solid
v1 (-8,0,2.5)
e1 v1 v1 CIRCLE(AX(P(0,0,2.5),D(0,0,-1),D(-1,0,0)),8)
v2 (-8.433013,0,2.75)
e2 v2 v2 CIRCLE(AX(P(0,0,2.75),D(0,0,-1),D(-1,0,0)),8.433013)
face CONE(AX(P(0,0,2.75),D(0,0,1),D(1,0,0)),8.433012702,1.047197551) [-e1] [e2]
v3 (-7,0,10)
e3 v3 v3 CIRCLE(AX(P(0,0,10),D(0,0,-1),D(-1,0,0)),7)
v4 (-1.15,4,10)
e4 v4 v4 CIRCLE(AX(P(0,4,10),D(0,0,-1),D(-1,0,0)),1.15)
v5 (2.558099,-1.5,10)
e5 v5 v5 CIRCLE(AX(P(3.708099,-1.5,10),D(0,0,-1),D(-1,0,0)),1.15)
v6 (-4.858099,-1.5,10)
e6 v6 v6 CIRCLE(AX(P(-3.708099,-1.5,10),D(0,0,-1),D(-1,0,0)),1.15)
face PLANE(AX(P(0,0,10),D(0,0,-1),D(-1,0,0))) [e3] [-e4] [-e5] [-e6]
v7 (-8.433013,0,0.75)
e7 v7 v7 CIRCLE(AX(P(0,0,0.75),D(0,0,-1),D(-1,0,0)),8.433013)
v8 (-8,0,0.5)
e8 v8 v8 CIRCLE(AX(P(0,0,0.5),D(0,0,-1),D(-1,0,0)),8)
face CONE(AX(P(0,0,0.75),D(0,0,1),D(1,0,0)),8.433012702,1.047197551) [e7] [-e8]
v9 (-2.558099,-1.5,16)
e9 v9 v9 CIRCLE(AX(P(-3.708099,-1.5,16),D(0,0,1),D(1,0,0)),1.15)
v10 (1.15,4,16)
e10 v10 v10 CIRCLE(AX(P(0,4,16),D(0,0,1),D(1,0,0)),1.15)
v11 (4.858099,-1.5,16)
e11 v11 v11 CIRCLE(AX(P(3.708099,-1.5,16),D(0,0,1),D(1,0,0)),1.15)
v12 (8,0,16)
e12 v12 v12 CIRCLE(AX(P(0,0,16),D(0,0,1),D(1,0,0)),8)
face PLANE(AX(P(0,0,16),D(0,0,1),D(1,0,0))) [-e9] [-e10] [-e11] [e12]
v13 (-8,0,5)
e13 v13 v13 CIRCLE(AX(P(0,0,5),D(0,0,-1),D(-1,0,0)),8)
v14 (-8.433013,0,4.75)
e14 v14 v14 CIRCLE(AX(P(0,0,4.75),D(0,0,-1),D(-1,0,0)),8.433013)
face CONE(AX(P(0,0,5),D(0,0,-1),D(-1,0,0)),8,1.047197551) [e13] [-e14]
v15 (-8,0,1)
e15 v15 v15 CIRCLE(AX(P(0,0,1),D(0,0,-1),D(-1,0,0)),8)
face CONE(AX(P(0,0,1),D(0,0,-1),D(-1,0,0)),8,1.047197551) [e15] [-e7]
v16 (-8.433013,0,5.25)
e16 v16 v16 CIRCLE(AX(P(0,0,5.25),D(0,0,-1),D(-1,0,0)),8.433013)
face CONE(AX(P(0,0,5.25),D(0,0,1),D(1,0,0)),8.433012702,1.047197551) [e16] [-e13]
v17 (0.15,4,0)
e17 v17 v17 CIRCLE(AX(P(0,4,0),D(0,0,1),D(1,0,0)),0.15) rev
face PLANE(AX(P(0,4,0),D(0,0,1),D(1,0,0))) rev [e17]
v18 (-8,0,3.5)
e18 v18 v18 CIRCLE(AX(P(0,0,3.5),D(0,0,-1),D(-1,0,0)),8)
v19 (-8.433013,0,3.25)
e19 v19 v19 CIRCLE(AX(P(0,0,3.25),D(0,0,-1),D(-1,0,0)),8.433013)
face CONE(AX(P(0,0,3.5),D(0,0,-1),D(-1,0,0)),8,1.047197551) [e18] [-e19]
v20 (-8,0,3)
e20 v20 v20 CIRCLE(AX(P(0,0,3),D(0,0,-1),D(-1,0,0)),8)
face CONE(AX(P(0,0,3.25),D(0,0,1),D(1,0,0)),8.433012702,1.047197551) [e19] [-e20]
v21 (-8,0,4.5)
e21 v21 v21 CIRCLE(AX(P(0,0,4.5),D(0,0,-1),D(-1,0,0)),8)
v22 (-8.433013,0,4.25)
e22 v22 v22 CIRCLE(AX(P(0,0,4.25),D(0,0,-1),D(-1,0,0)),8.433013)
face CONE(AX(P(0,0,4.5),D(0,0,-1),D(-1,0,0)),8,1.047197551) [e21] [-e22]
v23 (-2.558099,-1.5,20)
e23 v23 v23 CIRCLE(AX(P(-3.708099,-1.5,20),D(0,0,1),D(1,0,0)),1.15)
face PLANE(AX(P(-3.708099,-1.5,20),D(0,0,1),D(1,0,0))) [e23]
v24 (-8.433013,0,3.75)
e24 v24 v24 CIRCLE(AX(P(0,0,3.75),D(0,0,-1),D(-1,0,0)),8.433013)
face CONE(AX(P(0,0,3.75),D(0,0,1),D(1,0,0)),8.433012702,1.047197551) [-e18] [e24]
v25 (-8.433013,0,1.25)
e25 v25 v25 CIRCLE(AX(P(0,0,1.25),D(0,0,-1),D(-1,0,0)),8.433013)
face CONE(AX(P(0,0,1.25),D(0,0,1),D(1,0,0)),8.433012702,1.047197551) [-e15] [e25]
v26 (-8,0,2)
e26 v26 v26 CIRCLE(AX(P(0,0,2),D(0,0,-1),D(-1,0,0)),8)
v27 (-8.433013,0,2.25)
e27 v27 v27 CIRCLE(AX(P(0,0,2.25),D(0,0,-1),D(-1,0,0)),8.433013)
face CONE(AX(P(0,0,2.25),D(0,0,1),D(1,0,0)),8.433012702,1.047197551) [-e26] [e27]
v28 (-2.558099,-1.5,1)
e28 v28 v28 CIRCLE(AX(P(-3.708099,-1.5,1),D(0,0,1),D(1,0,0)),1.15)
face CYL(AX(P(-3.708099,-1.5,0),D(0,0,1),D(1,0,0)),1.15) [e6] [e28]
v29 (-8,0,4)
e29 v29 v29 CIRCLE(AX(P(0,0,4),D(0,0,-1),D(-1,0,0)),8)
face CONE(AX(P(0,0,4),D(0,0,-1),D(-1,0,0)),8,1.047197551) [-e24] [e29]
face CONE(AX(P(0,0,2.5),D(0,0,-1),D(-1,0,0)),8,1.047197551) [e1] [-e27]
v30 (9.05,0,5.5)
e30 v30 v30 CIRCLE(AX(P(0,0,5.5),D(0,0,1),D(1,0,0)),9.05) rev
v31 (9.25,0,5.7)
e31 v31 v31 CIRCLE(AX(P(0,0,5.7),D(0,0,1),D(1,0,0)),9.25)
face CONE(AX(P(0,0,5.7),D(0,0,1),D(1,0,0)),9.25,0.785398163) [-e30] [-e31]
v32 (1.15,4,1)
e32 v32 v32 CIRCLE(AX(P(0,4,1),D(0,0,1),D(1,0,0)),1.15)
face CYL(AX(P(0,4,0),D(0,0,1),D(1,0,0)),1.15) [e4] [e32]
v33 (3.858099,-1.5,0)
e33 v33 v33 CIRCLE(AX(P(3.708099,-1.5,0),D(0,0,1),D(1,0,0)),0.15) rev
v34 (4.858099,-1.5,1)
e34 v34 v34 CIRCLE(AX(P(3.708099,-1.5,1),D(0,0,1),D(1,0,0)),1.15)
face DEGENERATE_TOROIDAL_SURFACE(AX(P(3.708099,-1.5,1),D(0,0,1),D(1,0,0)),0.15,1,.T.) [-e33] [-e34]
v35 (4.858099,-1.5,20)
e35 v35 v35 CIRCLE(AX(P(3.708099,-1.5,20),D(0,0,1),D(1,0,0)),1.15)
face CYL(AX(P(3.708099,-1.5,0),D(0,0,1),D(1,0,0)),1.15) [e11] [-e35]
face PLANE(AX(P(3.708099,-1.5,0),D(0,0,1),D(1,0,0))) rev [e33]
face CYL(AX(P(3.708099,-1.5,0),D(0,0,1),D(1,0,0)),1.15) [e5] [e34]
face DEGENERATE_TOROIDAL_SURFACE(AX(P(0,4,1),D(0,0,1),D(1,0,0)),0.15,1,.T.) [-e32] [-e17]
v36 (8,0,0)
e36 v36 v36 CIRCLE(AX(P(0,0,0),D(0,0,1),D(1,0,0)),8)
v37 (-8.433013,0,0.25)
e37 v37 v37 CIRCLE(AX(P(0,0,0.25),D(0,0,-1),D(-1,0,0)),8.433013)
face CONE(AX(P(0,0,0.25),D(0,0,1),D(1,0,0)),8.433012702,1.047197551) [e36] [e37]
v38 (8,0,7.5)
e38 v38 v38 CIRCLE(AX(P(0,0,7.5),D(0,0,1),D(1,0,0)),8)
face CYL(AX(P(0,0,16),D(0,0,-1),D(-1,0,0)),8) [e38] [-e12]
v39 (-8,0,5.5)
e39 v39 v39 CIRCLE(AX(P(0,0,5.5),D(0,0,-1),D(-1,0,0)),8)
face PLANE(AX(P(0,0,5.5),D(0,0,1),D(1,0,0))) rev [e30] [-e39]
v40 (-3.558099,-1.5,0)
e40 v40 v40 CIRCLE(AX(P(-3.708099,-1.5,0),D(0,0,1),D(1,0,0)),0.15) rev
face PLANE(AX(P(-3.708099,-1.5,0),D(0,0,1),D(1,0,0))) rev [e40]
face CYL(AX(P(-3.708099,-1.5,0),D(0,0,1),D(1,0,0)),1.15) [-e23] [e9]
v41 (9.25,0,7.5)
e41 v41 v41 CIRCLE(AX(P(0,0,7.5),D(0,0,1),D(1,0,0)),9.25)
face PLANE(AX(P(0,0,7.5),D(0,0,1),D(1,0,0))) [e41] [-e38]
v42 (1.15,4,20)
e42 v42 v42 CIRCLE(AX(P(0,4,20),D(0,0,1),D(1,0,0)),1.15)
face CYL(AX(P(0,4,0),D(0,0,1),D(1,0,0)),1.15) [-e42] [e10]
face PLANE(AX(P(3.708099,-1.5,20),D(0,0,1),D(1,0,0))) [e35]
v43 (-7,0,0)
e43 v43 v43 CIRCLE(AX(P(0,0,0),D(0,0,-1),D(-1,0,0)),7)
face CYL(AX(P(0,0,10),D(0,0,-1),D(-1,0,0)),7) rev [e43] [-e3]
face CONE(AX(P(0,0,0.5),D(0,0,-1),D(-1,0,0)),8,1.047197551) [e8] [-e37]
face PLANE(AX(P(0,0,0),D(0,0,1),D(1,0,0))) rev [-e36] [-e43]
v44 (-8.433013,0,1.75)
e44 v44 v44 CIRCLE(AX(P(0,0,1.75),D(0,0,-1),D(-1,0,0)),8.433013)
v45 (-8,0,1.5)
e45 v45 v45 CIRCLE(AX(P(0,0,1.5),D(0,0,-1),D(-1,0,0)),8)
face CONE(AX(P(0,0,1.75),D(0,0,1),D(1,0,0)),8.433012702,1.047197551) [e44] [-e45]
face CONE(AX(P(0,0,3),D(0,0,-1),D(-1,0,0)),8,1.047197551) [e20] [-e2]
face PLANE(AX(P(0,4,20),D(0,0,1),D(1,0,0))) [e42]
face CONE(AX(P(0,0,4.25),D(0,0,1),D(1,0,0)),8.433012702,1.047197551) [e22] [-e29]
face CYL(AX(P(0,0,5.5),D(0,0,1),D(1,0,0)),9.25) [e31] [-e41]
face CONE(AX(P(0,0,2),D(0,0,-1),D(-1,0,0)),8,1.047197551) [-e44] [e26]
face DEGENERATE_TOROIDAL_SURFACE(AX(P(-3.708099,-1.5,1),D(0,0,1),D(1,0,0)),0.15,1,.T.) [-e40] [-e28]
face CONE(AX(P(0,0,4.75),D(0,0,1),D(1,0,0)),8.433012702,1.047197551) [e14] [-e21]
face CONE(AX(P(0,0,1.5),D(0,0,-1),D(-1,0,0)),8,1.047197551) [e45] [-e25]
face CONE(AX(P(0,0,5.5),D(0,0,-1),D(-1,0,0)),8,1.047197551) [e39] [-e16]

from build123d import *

# Parameters (mm, degrees)
ESBO_O1_R                     = 8
RESSALTO_EXTRUS_O1_DEPTH      = 16
RESSALTO_EXTRUS_O3_START      = -2
ESBO_O3_R                     = 9.25
ESBO_O3_R_2                   = 8
RESSALTO_EXTRUS_O3_DEPTH      = 2
ESBO_O4_R                     = 7
CORTE_EXTRUS_O1_DEPTH         = 10
RESSALTO_EXTRUS_O2_DEPTH      = 4
RESSALTO_EXTRUS_O2_DEPTH_BACK = 16
ESBO_O2_R                     = 1.15
FILETE1_R                     = 1
PADR_O_LINEAR1_COUNT          = 11
PADR_O_LINEAR1_PITCH          = 0.5
CHANFRO1_SIZE                 = 0.2


with BuildPart() as part:
    # Esboço1 → Ressalto-extrusão1 (new body)
    with BuildSketch(Plane.XY):
        Circle(ESBO_O1_R)
    extrude(amount=RESSALTO_EXTRUS_O1_DEPTH)

    # Esboço3 → Ressalto-extrusão3 (add)
    with BuildSketch(Plane.XY.offset(7.5).offset(RESSALTO_EXTRUS_O3_START)):
        Circle(ESBO_O3_R)
        Circle(ESBO_O3_R_2, mode=Mode.SUBTRACT)
    extrude(amount=RESSALTO_EXTRUS_O3_DEPTH)

    # Esboço4 → Corte-extrusão1 (cut)
    with BuildSketch(Plane(origin=(0, 0, 0), x_dir=(-1, 0, 0), z_dir=(0, 0, -1))):
        Circle(ESBO_O4_R)
    extrude(amount=-CORTE_EXTRUS_O1_DEPTH, mode=Mode.SUBTRACT)

    # Esboço2 → Ressalto-extrusão2 (add, two sides: drawn at the far end of the back side and taken through both)
    with BuildSketch(Plane.XY.offset(16).offset(-RESSALTO_EXTRUS_O2_DEPTH_BACK)):
        with Locations((0, 4)):
            Circle(ESBO_O2_R)
        with Locations((3.708099244, -1.5)):
            Circle(ESBO_O2_R)
        with Locations((-3.708099244, -1.5)):
            Circle(ESBO_O2_R)
    extrude(amount=RESSALTO_EXTRUS_O2_DEPTH + RESSALTO_EXTRUS_O2_DEPTH_BACK)

    # Filete1
    filete1_edges = [part.edges().sort_by_distance(p)[0] for p in [
        (2.558099244, -1.5, 0),
        (-4.858099244, -1.5, 0),
        (-1.15, 4, 0),
    ]]
    fillet(filete1_edges, radius=FILETE1_R)

    # Esboço5 → Revolução1 (revolve)
    with BuildSketch(Plane(origin=(0, 0, 0), x_dir=(1, 0, 0), z_dir=(0, 1, 0)), mode=Mode.PRIVATE) as revolu_o1_sk:
        Polygon((8, 0), (8.433012702, -0.25), (8, -0.5), align=None)
    revolu_o1 = revolve(revolu_o1_sk.sketch.rotate(Axis((0, 0, -3.692698903), (0, 0, 1)), 180), axis=Axis((0, 0, -3.692698903), (0, 0, 1)))

    # Padrão linear1: Revolução1 ×11
    with Locations(*[(0, 0, i * PADR_O_LINEAR1_PITCH) for i in range(1, PADR_O_LINEAR1_COUNT)]):
        add(revolu_o1)

    # Chanfro1
    chanfro1_edges = [part.edges().sort_by_distance(p)[0] for p in [
        (-9.25, 0, 5.5),
    ]]
    chamfer(chanfro1_edges, length=CHANFRO1_SIZE)


solid = part.part
